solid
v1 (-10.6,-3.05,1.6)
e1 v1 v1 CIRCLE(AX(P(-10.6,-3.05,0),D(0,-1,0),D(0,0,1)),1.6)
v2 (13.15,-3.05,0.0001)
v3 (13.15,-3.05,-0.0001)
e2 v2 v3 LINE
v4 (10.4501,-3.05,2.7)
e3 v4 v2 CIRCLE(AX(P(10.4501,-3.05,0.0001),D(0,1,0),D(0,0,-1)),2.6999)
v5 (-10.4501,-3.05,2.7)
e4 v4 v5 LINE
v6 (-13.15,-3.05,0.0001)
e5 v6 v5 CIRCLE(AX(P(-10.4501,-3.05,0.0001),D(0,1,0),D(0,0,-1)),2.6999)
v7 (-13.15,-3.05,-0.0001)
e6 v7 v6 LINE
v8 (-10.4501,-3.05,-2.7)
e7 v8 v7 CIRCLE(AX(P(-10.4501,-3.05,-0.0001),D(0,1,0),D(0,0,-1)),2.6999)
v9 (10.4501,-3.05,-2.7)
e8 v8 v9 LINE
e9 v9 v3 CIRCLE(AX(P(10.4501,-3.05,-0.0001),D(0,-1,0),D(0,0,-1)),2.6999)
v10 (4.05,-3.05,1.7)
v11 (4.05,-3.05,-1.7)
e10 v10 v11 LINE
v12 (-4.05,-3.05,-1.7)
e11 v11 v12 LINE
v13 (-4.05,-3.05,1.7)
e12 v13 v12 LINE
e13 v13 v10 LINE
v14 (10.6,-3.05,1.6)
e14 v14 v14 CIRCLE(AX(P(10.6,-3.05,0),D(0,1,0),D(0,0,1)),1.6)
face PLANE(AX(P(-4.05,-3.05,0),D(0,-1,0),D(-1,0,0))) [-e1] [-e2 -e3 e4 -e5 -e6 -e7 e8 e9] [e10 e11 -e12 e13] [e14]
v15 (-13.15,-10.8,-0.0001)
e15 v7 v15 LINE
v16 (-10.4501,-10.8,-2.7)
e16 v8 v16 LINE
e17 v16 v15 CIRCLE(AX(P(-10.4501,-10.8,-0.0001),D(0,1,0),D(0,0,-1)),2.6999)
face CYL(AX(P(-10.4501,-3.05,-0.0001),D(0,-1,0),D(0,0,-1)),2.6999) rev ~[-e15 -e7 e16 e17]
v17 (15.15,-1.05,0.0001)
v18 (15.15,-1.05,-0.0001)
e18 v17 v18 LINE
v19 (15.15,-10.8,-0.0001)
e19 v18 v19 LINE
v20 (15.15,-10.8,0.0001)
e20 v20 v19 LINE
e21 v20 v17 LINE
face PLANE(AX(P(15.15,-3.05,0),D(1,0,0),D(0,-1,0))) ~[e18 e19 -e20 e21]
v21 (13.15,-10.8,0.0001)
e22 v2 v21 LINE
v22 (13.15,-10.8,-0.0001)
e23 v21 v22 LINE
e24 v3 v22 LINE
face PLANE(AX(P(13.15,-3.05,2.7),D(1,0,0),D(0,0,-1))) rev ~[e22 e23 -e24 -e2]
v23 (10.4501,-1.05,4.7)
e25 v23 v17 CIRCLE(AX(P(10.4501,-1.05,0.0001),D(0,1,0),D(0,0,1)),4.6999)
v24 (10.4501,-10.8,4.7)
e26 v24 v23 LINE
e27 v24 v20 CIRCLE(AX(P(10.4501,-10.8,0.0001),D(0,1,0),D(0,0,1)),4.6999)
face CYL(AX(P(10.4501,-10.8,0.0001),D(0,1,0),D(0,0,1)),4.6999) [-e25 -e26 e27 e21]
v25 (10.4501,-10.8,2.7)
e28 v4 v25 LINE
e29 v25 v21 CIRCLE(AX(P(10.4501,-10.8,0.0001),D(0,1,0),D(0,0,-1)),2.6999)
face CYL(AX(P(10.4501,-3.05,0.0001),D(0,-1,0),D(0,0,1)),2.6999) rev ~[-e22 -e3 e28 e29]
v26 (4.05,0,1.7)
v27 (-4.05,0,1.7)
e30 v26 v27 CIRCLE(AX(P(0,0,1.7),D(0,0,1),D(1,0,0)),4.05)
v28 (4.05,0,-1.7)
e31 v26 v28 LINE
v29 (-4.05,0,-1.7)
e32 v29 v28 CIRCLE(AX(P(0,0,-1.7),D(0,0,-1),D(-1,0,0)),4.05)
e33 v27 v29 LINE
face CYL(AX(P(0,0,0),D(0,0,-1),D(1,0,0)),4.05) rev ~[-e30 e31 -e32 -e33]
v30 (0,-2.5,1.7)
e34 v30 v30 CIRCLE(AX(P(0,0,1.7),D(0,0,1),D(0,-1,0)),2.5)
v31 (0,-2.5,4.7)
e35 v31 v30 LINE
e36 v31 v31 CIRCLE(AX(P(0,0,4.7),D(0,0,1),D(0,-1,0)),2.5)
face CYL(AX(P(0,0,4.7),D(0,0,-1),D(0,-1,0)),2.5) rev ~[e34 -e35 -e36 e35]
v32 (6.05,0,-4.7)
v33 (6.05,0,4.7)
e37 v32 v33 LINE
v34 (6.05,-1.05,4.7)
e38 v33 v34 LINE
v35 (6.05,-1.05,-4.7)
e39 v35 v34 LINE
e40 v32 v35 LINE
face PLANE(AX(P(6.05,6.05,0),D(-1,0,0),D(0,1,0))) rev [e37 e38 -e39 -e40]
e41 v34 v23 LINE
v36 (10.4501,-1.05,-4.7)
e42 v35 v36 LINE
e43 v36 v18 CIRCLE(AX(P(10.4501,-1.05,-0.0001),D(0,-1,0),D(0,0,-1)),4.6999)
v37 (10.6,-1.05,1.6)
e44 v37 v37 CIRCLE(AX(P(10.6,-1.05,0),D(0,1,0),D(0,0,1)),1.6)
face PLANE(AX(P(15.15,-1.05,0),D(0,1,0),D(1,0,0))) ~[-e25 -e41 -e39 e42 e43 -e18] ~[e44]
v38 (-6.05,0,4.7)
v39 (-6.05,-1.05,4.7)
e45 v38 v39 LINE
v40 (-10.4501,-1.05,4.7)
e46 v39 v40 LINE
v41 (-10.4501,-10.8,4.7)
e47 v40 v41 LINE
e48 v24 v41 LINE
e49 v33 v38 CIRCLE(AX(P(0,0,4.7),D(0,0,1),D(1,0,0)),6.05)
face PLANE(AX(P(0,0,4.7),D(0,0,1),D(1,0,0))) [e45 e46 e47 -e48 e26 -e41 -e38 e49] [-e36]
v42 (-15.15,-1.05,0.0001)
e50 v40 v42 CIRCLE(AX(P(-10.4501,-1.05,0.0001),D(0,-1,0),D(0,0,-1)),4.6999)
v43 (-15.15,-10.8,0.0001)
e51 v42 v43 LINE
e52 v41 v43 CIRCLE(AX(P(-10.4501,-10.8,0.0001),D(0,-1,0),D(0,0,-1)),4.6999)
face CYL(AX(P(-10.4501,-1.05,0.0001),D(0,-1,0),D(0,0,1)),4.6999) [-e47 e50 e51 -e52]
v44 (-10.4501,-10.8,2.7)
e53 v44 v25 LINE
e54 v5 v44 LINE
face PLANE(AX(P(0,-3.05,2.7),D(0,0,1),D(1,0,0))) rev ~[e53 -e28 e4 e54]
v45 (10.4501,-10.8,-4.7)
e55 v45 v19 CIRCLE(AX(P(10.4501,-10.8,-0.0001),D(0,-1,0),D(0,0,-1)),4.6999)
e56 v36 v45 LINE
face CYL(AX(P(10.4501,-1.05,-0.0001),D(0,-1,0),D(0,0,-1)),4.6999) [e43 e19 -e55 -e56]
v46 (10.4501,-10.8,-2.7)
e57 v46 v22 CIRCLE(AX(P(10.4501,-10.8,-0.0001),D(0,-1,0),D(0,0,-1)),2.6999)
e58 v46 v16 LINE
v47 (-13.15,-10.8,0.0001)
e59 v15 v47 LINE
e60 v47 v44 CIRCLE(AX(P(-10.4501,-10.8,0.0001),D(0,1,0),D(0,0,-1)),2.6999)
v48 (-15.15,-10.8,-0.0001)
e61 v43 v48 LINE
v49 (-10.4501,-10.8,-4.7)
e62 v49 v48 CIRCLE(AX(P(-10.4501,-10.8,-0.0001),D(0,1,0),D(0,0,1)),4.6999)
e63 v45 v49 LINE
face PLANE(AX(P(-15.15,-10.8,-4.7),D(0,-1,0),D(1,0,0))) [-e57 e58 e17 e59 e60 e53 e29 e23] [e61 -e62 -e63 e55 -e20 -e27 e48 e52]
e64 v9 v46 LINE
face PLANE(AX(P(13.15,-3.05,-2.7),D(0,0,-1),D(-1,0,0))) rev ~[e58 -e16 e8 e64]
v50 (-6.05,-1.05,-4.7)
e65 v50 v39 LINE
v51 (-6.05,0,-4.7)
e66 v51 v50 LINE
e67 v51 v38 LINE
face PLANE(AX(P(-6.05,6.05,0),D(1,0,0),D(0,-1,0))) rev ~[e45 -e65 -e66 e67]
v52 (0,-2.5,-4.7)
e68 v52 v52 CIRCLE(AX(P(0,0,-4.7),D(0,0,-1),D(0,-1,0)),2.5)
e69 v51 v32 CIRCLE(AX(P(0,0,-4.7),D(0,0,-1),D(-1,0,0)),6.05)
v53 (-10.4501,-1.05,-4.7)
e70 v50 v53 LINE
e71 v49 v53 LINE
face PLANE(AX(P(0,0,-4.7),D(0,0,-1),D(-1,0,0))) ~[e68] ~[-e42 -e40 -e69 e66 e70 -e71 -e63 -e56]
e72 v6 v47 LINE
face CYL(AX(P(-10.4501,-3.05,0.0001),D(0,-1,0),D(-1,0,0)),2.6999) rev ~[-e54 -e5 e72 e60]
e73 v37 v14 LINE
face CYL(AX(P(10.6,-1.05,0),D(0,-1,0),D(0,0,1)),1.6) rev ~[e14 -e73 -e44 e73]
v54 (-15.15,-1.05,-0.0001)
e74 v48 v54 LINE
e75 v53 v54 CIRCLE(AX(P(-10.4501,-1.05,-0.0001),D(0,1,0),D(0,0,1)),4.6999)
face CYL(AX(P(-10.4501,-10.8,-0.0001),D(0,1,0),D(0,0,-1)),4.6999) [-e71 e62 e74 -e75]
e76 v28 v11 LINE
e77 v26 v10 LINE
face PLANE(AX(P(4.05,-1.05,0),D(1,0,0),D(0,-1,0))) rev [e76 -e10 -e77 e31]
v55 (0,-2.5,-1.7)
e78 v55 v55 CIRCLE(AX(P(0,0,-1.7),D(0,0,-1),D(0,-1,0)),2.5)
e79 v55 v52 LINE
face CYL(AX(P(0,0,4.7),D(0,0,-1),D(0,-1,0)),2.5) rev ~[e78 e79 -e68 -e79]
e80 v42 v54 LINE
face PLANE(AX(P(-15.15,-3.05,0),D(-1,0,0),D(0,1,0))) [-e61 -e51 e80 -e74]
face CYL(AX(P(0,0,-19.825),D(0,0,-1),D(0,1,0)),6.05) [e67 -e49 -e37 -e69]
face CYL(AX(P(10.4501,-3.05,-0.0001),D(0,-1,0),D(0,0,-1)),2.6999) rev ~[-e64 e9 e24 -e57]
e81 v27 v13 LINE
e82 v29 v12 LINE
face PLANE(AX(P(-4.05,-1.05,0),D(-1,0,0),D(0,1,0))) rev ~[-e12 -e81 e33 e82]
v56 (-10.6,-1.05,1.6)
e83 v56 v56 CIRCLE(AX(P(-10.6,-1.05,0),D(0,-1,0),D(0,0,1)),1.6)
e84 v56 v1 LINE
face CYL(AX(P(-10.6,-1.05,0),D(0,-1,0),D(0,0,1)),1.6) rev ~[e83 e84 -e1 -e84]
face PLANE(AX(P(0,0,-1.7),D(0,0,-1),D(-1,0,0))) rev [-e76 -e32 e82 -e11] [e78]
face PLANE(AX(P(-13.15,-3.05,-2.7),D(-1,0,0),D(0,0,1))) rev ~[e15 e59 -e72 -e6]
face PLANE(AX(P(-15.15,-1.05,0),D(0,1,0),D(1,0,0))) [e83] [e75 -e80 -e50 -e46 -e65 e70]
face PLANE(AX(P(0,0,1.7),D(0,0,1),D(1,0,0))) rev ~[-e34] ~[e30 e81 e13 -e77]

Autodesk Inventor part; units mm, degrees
ref_plane "YZ Plane" through (0, 0, 0) normal (1, 0, 0) x (0, 1, 0)
ref_plane "XZ Plane" through (0, 0, 0) normal (0, 1, 0) x (-1, 0, 0)
ref_plane "XY Plane" through (0, 0, 0) normal (0, 0, 1) x (1, 0, 0)
sketch "Эскиз1" plane through (0, 0, 0) normal (0, 0, 1) x (1, 0, 0)
  circle A0 centre (0, 0) radius 4.05
  line L0 (-6.05, -6.05) -> (6.05, -6.05)
  line L1 (6.05, -6.05) -> (6.05, 6.05)
  line L2 (6.05, 6.05) -> (-6.05, 6.05)
  line L3 (-6.05, 6.05) -> (-6.05, -6.05)
  line L4 (-6.05, -6.05) -> (6.05, 6.05) construction
  line L5 (6.05, -6.05) -> (-6.05, 6.05) construction
  line L6 (0, 4.05) -> (0, 6.05)
  line L7 (-4.05, 0) -> (-6.05, 0)
  line L8 (-15.15, -1.05) -> (0, -1.05)
  line L9 (0, -1.05) -> (0, -3.05)
  line L10 (0, -3.05) -> (-15.15, -3.05)
  line L11 (-15.15, -3.05) -> (-15.15, -1.05)
  line L12 (-4.05, 0) -> (4.05, 0)
  line L13 (4.05, 0) -> (4.05, -3.05)
  line L14 (4.05, -3.05) -> (-4.05, -3.05)
  line L15 (-4.05, -3.05) -> (-4.05, 0)
  line L16 (4.05, -3.05) -> (6.05, -3.05)
  line L17 (6.05, -3.05) -> (6.05, 0)
  line L18 (6.05, 0) -> (4.05, 0)
  line L19 (4.05, 0) -> (4.05, -3.05)
  point P0 (0, -2.05)
  point P1 (0, -6.05)
  point P2 (-6.05, -1.05)
  point P3 (-2.6646, -3.05)
  point P4 (-4.05, -3.05)
  point P5 (2.6646, -3.05)
  point P6 (-6.05, -3.05)
  point P7 (-4.05, -1.05)
  point P8 (-3.9115, -1.05)
  point P9 (-2.6646, -3.05)
  dimension "d0" = 8.1
  dimension "d1" = 2
  dimension "d2" = 2
  dimension "d3" = 9.1
  dimension "d4" = 2
  dimension "d5" = 3
extrude "Выдавливание1" add sketch "Эскиз1" along normal blind 1.7 contours A0 L7 L3 L2 L6 | L15 L8 L3 L7 | L15 L10 L3 L8 | L3 L10 L11 L8
sketch "Эскиз2" plane through (0, 0, 1.7) normal (0, 0, 1) x (1, 0, 0)
  line L0 (-6.05, -1.05) -> (-15.15, -1.05) projected
  line L1 (-15.15, -1.05) -> (-15.15, -3.05) projected
  line L2 (-15.15, -3.05) -> (-4.05, -3.05) projected
  line L3 (-4.05, -3.05) -> (-4.05, 0) projected
  arc A0 (0, 4.05) -> (-4.05, 0) centre (0, 0) ccw projected
  line L4 (0, 4.05) -> (0, 6.05) projected
  line L5 (0, 6.05) -> (-6.05, 6.05) projected
  line L6 (-6.05, 6.05) -> (-6.05, -1.05) projected
  line L7 (0, 4.05) -> (-4.05, 4.05)
  line L8 (-4.05, 4.05) -> (-4.05, -3.05)
  line L9 (-4.05, -3.05) -> (0, -3.05)
  line L10 (0, -3.05) -> (0, 4.05)
extrude "Выдавливание2" add sketch "Эскиз2" along normal blind 3
mirror "Зеркальное отражение1" about plane through (-9.6, -2.05, 0) normal (0, 0, -1)
sketch "Эскиз4" plane through (-15.15, -1.05, 4.7) normal (0, 1, 0) x (1, 0, 0)
  line L0 (0, 9.4) -> (0, 0) projected
  line L1 (0, 4.7) -> (9.1, 4.7)
  line L2 (9.1, 9.4) -> (9.1, 0) projected
  point P0 (15.15, 4.7)
  point P1 (4.55, 4.7)
hole "Отверстие2" at (-10.6, -1.05, 0) direction (0, -1, 0) diameter 3.2 end through all
mirror "Зеркальное отражение2" about plane through (0, 4.05, 0) normal (1, 0, 0)
sketch "Эскиз3" plane through (0, 0, 4.7) normal (0, 0, 1) x (1, 0, 0)
  arc A0 (2.6646, -3.05) -> (4.05, 0) centre (0, 0) ccw projected
  arc A1 (2.6646, -3.05) -> (4.05, 0) centre (0, 0) ccw projected
hole "Отверстие1" at (0, 0, 4.7) direction (0, 0, -1) diameter 5 end through all
fillet "Сопряжение1" radius 6.05 2 edges at (-6.05, 6.05, 0) (6.05, 6.05, 0)
sketch "Эскиз7" plane through (-15.15, -3.05, -4.7) normal (0, -1, 0) x (1, 0, 0)
  line L0 (30.3, 0) -> (0, 0) projected
  line L1 (0, 9.4) -> (30.3, 9.4) projected
  line L2 (12.65, 9.4) -> (17.65, 9.4) projected
  line L3 (15.15, 9.4) -> (15.15, 0)
  line L4 (28.3, 2) -> (2, 2)
  line L5 (2, 2) -> (2, 7.4)
  line L6 (2, 7.4) -> (28.3, 7.4)
  line L7 (28.3, 7.4) -> (28.3, 2)
  line L8 (28.3, 2) -> (2, 7.4) construction
  line L9 (2, 2) -> (28.3, 7.4) construction
  line L10 (0, 9.4) -> (0, 0) projected
  line L11 (30.3, 9.4) -> (30.3, 0) projected
  point P0 (15.15, 4.7)
  dimension "d29" = 2
  dimension "d30" = 2
extrude "Выдавливание4" add sketch "Эскиз7" along normal blind 7.75 contours L0 L3 L4 L7 L6 L1 L11 | L0 L10 L1 L3 L6 L5 L4
fillet "Сопряжение2" radius 4.7 4 edges at (15.15, -5.925, -4.7) (15.15, -5.925, 4.7) (-15.15, -5.925, -4.7) (-15.15, -5.925, 4.7)
fillet "Сопряжение3" radius 2.7 4 edges at (13.15, -6.925, -2.7) (13.15, -6.925, 2.7) (-13.15, -6.925, 2.7) (-13.15, -6.925, -2.7)
properties part number "Крышка стойки подшипника 3мм"
